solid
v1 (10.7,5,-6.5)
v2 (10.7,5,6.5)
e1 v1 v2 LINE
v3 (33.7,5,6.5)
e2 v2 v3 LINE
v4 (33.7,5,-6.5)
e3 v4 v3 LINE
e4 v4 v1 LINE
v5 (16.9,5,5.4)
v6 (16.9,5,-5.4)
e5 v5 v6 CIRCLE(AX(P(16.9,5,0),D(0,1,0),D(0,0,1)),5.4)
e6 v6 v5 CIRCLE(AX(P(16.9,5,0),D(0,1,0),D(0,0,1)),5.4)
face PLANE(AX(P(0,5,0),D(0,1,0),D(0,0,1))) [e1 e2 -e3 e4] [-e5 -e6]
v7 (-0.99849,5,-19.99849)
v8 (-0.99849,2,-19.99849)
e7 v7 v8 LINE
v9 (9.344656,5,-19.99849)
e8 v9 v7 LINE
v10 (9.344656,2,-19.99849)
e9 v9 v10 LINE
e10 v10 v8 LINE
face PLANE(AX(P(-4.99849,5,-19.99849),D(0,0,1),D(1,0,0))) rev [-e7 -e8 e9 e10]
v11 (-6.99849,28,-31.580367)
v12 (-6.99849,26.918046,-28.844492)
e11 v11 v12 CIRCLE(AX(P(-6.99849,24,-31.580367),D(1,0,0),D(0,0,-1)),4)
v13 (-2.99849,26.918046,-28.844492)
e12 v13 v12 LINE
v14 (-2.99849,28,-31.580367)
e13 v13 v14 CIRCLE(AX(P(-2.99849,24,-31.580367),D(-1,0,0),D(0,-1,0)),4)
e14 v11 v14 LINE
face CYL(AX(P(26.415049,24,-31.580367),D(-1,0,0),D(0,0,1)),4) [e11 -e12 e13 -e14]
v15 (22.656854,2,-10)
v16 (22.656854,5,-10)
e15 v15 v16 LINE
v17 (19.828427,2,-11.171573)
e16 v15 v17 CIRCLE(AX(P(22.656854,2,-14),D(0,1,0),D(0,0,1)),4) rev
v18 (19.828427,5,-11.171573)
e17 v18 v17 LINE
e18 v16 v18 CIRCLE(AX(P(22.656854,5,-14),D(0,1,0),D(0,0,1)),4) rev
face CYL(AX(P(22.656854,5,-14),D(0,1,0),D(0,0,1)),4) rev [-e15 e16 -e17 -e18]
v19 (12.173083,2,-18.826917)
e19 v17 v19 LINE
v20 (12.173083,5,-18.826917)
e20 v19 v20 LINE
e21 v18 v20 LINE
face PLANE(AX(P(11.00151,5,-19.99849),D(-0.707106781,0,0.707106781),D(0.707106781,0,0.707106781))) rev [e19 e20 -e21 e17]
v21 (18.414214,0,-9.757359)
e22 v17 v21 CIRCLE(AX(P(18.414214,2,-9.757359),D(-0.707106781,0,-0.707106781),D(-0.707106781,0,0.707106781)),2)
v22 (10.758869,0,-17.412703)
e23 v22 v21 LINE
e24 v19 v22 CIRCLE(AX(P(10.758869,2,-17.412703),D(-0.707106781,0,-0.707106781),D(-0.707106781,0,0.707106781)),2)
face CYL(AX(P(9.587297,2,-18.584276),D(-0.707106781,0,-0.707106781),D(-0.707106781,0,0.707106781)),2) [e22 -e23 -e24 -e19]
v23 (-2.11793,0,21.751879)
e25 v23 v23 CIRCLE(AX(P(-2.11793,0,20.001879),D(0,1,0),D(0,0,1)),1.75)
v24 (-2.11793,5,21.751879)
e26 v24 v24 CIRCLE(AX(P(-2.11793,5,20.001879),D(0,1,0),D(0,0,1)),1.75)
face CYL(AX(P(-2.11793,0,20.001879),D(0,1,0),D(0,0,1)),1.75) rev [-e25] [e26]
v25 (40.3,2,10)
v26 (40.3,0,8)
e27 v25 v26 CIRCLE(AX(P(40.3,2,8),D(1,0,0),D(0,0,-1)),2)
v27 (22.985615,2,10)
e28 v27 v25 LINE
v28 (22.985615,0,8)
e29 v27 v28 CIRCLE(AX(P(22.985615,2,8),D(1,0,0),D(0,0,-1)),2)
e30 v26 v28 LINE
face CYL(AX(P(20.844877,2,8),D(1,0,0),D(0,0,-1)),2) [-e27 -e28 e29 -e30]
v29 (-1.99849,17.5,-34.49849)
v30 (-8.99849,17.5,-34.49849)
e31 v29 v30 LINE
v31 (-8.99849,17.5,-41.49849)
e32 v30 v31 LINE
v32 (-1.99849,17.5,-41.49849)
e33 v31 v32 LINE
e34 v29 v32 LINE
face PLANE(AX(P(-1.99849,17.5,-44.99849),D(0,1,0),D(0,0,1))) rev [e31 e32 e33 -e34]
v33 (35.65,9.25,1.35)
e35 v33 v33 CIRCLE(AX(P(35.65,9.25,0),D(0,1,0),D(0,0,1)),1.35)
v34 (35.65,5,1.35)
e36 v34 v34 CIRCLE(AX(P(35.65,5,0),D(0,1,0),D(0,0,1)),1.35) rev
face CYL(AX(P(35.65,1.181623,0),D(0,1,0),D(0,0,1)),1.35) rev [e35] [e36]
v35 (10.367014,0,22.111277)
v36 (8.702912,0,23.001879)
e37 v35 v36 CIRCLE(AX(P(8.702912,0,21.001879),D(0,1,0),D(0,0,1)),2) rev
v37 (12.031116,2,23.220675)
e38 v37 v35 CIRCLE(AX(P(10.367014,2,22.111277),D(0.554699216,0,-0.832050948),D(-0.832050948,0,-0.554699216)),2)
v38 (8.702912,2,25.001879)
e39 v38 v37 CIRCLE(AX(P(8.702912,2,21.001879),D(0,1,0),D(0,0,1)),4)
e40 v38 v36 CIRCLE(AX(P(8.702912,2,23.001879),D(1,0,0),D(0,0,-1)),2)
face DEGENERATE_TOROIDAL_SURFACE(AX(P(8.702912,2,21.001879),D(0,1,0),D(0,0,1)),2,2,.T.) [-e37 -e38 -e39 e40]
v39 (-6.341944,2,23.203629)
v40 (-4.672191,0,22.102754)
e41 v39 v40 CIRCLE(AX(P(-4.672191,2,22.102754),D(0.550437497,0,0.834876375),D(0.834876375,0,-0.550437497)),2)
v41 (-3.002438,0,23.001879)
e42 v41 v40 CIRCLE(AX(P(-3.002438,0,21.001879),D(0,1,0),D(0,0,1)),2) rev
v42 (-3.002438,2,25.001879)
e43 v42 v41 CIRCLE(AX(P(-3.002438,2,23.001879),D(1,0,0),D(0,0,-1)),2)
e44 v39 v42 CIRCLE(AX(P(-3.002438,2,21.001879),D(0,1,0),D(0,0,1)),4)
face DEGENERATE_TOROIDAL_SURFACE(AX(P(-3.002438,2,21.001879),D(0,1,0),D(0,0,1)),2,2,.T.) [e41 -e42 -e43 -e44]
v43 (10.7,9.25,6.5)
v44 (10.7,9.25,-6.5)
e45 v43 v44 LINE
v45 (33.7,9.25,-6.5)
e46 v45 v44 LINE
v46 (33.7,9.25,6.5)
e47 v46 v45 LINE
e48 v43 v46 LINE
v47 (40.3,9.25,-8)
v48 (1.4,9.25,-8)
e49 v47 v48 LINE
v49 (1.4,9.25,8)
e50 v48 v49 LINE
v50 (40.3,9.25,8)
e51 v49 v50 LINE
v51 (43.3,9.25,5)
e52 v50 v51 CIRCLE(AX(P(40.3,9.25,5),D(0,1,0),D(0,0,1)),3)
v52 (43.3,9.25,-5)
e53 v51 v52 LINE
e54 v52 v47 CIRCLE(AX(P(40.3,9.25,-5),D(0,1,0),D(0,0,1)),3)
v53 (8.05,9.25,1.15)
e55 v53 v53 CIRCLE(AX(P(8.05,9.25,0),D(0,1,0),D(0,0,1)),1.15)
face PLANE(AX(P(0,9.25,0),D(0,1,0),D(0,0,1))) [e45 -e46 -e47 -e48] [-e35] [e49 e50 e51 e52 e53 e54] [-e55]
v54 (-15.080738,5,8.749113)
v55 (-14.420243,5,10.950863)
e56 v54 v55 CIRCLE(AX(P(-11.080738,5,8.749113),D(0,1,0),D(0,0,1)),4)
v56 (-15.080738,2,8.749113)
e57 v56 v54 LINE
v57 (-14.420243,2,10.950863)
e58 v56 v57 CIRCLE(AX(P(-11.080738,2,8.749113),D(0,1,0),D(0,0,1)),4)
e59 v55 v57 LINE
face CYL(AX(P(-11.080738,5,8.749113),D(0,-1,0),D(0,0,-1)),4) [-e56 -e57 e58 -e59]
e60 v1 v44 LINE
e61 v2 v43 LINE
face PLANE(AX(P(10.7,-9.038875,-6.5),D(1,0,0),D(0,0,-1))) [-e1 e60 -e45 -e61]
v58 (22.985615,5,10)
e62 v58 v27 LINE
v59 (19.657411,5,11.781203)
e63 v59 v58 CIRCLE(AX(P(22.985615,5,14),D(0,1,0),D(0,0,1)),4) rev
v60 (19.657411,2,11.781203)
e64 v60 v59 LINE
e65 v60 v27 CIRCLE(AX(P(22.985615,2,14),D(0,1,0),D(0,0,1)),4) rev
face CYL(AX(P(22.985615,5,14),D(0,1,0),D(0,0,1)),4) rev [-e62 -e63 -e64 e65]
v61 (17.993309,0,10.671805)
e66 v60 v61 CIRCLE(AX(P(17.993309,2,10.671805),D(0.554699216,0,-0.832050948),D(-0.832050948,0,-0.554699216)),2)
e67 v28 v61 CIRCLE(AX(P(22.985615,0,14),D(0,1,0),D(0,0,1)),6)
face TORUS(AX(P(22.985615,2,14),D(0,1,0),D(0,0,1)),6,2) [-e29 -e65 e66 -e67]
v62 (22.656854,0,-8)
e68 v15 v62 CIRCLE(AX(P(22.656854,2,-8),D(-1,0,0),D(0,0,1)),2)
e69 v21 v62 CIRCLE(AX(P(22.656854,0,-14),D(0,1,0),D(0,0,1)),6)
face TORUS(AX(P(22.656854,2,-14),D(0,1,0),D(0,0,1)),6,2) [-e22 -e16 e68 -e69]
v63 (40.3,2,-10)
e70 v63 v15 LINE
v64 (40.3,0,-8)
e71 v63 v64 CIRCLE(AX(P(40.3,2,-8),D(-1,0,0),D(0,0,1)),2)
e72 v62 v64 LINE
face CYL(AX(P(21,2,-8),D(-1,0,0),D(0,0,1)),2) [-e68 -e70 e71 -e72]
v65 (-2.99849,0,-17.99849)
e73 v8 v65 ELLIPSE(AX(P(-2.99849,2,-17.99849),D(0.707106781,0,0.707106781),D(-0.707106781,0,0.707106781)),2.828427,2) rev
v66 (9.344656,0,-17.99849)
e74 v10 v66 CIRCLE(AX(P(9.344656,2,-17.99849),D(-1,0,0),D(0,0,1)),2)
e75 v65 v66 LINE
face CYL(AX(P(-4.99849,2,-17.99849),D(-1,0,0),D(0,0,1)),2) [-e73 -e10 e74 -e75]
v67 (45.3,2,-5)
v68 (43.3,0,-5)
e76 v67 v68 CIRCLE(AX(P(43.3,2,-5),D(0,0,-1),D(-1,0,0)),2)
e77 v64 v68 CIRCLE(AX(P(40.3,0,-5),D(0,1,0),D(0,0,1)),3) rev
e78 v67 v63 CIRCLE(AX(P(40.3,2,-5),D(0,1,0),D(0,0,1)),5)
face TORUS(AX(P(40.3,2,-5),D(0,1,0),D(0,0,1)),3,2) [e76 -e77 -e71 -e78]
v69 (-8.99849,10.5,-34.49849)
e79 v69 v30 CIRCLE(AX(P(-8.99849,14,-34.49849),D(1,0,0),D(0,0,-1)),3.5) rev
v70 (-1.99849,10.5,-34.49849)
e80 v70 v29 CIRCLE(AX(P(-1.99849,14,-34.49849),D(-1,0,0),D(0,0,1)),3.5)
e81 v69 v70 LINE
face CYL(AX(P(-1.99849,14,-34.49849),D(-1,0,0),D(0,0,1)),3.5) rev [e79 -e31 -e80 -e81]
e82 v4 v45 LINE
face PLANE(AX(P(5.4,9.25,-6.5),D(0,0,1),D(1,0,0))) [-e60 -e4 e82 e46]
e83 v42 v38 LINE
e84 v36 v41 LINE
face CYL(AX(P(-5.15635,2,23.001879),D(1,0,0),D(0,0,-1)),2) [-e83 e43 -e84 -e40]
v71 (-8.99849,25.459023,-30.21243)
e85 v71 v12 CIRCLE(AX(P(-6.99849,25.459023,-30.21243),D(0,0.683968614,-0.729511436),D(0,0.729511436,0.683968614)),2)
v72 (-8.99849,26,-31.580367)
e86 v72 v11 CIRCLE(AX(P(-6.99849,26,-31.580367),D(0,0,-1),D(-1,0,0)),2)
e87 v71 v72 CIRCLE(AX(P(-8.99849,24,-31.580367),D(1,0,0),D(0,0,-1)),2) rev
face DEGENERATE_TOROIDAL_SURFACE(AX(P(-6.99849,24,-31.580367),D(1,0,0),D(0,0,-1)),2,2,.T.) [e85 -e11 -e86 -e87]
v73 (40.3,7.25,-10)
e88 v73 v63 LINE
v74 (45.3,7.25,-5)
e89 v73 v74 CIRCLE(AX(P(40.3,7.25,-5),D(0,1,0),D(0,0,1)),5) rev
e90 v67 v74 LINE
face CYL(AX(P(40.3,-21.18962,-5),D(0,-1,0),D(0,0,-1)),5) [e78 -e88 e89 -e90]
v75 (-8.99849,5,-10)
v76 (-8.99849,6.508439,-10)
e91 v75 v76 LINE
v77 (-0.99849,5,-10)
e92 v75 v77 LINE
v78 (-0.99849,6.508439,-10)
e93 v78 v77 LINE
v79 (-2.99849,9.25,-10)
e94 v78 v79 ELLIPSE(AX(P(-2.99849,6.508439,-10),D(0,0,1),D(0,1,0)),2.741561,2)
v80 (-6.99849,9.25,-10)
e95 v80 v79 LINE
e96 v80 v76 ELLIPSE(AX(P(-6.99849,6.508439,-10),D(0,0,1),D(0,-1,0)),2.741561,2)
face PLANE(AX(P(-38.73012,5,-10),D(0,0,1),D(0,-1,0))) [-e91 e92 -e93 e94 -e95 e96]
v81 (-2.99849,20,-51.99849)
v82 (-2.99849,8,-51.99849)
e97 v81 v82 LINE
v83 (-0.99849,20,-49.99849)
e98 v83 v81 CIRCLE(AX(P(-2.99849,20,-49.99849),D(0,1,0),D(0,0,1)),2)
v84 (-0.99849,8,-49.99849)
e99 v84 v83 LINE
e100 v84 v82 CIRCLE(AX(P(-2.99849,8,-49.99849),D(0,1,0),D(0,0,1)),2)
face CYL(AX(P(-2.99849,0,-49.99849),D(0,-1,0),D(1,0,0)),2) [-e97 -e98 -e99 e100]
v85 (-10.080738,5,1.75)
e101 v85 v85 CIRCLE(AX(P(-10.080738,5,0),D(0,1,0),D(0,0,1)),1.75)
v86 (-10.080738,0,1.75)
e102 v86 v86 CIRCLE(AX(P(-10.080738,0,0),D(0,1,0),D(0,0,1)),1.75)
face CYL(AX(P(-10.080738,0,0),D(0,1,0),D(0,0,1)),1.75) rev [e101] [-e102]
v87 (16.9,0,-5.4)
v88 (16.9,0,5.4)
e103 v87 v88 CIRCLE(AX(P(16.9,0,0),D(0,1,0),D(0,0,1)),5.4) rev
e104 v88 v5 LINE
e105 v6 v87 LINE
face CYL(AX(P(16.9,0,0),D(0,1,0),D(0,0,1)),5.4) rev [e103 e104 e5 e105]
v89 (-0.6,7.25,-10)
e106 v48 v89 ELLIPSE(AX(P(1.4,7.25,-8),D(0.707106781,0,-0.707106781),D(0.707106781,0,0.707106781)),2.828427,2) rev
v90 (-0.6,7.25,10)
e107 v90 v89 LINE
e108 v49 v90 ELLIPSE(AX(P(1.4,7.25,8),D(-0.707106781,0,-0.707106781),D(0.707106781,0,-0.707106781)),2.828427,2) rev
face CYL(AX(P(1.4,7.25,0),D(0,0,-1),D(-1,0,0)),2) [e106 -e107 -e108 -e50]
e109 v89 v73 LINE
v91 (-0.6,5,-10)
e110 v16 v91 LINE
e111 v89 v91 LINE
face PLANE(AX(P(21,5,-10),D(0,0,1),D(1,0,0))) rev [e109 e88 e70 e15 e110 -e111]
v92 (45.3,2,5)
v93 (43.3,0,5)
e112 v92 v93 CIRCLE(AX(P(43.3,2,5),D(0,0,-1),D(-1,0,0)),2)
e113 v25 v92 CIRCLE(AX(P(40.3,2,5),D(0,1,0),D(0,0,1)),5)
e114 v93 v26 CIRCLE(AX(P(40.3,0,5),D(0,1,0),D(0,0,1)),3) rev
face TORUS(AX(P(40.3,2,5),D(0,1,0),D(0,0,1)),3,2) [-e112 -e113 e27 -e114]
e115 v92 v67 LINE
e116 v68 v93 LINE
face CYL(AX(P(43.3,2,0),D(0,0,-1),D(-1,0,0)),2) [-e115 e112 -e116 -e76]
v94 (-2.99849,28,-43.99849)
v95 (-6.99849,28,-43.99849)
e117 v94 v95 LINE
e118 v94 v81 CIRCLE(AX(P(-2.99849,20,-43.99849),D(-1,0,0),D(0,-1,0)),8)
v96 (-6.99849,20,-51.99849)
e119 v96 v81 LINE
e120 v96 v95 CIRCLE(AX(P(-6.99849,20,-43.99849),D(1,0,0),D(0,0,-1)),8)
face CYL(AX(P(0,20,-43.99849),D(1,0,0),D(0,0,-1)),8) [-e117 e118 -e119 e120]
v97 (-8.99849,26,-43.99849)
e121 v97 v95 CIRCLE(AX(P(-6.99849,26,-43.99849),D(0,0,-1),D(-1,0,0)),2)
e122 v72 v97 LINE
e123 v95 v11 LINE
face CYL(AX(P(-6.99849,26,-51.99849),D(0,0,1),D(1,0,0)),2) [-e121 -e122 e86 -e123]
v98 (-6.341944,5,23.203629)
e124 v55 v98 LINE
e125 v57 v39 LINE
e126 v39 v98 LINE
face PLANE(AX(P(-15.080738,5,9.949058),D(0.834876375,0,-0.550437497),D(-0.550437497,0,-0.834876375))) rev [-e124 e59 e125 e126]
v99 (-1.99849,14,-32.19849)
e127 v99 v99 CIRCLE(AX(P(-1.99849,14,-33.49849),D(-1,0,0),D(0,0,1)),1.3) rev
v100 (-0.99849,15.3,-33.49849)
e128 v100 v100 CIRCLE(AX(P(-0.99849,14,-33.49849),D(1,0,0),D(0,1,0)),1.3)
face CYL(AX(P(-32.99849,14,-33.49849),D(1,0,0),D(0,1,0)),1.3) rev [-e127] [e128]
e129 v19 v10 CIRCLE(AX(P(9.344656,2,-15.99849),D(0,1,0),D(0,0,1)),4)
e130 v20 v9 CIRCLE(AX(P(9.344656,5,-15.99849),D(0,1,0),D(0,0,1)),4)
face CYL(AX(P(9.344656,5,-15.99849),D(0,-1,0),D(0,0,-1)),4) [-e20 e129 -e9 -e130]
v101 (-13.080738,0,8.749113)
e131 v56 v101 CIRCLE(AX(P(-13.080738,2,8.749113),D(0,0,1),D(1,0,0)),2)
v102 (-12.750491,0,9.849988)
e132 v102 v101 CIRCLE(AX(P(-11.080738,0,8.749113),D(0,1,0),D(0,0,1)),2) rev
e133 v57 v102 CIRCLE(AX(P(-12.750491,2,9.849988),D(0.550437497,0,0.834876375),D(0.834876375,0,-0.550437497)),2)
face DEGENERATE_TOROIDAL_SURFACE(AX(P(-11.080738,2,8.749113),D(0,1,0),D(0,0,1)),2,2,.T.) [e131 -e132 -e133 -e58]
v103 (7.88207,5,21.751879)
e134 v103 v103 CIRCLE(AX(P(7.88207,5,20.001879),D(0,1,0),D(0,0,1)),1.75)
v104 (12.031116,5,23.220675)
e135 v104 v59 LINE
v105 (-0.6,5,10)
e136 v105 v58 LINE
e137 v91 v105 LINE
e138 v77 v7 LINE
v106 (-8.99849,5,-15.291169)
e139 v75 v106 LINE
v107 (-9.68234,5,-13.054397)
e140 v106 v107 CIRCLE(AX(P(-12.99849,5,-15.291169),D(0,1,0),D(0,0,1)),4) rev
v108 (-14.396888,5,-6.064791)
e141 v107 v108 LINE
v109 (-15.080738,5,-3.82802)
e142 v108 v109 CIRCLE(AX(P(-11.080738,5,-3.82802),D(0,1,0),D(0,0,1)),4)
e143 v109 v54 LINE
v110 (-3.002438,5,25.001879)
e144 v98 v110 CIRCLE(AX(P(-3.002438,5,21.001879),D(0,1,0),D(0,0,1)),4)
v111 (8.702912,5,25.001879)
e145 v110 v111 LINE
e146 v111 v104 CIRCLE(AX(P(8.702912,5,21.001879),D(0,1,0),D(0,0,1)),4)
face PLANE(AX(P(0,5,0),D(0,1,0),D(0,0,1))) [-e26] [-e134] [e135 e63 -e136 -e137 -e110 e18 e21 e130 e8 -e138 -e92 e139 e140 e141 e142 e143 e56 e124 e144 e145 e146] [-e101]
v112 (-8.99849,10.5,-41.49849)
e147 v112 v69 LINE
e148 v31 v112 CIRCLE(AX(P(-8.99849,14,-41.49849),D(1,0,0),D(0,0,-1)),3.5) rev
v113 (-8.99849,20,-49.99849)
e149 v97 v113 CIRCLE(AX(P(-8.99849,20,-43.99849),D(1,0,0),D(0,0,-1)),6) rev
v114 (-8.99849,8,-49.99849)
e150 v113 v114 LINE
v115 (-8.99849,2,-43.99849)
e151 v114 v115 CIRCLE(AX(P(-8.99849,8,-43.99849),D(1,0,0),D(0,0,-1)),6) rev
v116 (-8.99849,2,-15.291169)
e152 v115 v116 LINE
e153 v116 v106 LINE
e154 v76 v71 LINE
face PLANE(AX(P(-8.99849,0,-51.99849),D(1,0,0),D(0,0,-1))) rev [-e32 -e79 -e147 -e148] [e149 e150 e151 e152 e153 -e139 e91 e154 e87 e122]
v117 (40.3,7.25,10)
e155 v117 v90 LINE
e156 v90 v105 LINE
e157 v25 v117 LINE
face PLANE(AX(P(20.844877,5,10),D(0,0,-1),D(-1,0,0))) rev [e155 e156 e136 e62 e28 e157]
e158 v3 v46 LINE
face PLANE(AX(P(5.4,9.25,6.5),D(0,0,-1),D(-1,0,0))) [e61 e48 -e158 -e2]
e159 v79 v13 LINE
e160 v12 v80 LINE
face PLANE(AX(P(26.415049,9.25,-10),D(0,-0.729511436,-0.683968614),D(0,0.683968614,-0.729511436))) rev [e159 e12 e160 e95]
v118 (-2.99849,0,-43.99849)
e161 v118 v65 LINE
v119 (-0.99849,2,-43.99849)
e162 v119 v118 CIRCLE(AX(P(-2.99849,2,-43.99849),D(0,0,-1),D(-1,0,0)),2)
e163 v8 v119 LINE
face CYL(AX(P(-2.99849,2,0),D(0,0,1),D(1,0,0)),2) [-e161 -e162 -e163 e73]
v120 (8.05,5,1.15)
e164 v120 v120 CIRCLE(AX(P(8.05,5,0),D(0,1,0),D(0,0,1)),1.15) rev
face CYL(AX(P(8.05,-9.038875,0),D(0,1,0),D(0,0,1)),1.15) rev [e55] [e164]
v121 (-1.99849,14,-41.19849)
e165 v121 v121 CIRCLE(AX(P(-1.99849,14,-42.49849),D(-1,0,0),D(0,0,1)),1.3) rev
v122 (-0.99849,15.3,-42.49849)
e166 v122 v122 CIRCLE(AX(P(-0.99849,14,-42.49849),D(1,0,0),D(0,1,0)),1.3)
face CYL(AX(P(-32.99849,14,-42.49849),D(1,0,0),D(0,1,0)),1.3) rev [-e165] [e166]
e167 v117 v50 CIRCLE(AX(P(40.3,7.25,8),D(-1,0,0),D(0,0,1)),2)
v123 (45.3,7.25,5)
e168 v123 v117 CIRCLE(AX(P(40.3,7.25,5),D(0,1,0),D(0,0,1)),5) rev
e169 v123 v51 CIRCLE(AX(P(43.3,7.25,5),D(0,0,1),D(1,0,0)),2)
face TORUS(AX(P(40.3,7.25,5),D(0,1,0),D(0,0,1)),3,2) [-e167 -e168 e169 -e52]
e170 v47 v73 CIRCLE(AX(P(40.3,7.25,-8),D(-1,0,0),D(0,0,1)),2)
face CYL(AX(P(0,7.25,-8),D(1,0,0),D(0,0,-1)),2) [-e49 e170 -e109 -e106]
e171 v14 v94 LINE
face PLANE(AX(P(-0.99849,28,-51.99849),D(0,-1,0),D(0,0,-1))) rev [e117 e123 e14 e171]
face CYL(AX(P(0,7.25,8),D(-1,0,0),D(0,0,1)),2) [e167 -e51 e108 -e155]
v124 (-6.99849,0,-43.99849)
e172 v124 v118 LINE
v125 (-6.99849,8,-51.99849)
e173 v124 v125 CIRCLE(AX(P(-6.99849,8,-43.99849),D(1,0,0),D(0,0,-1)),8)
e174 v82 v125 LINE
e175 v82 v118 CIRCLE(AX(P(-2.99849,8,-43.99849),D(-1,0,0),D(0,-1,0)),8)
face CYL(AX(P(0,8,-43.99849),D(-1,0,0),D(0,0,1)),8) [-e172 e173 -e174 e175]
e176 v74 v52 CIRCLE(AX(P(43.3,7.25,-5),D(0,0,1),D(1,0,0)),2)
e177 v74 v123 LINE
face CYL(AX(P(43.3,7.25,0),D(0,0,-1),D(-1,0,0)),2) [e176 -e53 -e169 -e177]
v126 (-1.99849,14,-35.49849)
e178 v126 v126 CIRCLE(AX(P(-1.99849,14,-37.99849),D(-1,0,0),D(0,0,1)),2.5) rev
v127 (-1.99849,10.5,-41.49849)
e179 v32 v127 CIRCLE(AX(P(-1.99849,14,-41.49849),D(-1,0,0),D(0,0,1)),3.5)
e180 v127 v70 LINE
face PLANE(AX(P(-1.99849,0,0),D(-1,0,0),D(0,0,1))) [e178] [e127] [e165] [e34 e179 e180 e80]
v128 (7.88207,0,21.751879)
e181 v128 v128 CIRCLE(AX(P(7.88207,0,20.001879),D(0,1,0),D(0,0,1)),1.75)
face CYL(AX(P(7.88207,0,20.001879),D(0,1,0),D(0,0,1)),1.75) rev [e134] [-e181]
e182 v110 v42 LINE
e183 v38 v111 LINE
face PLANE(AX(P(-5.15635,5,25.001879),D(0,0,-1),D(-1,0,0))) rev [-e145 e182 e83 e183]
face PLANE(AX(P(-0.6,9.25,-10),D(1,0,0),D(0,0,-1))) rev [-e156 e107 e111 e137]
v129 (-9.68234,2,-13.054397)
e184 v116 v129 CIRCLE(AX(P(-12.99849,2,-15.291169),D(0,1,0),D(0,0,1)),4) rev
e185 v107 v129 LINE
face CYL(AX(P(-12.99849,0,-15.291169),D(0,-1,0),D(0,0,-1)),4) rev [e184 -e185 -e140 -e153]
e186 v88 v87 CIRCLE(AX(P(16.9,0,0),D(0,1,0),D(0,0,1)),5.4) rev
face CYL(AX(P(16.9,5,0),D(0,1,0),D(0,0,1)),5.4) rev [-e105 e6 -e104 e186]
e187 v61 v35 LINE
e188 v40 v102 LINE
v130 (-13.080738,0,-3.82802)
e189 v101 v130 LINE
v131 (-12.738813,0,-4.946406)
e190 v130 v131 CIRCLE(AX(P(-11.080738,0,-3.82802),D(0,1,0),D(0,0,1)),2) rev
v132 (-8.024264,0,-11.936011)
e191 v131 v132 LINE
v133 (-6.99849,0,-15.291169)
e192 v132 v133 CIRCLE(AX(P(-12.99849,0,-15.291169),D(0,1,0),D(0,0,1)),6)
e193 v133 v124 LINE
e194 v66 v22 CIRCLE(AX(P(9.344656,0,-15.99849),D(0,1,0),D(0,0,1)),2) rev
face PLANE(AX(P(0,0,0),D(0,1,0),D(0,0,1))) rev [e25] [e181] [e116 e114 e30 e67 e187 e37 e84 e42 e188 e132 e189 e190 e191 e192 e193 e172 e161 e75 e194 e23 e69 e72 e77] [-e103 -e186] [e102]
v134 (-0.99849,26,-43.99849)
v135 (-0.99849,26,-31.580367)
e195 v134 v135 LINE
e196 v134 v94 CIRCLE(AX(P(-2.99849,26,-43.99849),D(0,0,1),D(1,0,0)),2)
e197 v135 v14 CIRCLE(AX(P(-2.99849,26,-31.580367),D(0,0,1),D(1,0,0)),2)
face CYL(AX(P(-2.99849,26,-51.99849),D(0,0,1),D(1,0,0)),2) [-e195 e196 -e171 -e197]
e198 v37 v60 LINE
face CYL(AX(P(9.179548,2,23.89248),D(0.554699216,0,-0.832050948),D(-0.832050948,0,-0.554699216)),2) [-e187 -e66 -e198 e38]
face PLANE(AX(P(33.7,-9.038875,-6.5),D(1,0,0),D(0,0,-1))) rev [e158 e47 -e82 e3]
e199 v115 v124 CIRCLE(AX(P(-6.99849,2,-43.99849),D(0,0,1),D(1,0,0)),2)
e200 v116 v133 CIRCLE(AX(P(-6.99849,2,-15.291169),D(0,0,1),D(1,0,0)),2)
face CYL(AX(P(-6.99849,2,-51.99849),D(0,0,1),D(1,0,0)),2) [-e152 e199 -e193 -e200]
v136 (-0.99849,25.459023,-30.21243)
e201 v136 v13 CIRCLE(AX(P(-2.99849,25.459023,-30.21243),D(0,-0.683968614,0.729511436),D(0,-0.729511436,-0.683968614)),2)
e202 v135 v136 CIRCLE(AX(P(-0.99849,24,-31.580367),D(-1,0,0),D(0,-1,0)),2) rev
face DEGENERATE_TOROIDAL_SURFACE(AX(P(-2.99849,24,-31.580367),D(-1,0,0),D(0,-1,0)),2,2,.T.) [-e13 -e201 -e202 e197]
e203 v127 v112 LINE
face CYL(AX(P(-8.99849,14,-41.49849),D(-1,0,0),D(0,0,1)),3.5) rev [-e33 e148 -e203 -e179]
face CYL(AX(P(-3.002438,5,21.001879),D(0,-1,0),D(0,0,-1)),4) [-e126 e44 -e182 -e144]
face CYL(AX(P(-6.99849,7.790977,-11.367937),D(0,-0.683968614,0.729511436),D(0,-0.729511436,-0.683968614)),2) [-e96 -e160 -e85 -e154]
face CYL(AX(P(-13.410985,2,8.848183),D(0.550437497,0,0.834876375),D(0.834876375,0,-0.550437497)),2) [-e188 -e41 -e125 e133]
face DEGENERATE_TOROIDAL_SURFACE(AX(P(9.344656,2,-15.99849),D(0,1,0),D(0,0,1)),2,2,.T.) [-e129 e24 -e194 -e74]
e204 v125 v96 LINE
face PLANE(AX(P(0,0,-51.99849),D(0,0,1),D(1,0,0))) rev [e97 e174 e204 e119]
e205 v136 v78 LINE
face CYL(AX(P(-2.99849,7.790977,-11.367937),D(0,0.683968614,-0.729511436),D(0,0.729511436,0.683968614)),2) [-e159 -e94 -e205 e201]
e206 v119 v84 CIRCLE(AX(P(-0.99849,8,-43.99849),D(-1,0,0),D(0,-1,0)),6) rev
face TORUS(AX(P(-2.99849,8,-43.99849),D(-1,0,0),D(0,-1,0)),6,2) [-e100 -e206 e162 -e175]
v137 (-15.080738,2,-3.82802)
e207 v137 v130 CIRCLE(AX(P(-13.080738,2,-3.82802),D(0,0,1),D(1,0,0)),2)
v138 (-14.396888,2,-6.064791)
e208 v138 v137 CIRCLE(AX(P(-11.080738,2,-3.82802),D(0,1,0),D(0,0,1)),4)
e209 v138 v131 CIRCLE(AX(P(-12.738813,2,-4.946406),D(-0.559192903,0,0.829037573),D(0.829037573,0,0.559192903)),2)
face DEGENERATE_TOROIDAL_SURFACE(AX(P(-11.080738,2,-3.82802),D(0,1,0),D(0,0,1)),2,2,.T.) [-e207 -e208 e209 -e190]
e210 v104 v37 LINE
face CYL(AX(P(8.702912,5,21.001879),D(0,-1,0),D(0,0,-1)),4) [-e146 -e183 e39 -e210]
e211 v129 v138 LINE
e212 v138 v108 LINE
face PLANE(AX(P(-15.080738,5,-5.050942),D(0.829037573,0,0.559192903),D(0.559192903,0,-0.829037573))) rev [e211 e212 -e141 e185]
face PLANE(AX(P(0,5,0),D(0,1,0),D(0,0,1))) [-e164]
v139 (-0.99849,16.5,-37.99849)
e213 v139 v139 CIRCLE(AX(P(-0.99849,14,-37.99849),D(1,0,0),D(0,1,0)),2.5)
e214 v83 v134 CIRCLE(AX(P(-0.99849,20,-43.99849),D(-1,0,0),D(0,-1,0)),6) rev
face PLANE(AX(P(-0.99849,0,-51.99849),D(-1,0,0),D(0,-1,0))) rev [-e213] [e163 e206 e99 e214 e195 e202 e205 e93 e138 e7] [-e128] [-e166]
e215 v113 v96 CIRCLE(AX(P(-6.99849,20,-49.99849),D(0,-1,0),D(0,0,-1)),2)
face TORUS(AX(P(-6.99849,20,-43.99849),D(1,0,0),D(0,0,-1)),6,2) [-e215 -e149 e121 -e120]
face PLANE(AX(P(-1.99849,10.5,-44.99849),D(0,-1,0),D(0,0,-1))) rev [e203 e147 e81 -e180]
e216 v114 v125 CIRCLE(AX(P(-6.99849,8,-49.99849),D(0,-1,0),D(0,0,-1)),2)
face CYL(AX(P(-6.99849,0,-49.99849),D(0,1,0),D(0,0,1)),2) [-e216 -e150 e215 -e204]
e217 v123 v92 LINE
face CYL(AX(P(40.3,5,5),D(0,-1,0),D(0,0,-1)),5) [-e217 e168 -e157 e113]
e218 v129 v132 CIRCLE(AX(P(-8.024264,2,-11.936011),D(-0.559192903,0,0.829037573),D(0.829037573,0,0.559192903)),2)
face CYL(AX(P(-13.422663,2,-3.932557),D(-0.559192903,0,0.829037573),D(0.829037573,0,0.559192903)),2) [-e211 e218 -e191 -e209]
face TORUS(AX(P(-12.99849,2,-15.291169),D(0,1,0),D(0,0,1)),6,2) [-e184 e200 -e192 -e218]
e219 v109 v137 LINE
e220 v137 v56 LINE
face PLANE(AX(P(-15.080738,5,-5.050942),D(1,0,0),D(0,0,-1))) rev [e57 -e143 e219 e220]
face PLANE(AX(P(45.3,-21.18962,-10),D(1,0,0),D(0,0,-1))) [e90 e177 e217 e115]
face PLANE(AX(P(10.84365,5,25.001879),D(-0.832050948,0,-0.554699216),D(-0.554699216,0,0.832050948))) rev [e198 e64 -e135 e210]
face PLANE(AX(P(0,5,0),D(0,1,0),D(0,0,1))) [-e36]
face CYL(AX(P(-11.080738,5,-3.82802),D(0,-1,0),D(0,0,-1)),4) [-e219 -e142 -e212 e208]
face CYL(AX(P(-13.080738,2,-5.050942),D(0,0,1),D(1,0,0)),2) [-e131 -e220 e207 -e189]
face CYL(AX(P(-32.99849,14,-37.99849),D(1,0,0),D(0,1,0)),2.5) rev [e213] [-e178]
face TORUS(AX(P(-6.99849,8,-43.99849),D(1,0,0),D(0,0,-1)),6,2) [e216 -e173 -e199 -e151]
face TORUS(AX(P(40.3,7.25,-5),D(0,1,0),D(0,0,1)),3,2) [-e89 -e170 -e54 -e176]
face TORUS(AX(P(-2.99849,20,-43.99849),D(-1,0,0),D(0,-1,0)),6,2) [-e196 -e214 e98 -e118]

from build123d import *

# Parameters (mm, degrees)
BOSS_EXTRUDE1_DEPTH  = 5
SKETCH3_R            = 1.75
SKETCH3_W            = 10.8
SKETCH3_H            = 10.8
CUT_EXTRUDE1_DEPTH   = 52.721310243
FILLET1_R            = 5.4
FILLET2_R            = 5.4
SKETCH4_W            = 35
SKETCH4_H            = 20
SKETCH4_W_2          = 23
SKETCH4_H_2          = 13
BOSS_EXTRUDE2_DEPTH  = 4.25
SKETCH5_W            = 10.6
SKETCH5_H            = 20
CUT_EXTRUDE2_DEPTH   = 52.721310243
FILLET4_R            = 4
SKETCH6_W            = 8
SKETCH6_H            = 28
BOSS_EXTRUDE3_DEPTH  = 32
SKETCH7_R            = 1.3
SKETCH7_R_2          = 2.5
CUT_EXTRUDE3_DEPTH   = 32
FILLET5_R            = 8
BOSS_EXTRUDE4_DEPTH  = 8
SKETCH9_W            = 14
SKETCH9_H            = 7
CUT_EXTRUDE4_DEPTH   = 7
FILLET6_R            = 3.5
FILLET7_R            = 3.5
CUT_EXTRUDE5_DEPTH   = 8
FILLET8_R            = 4
BOSS_EXTRUDE6_START  = -9.25
BOSS_EXTRUDE6_DEPTH  = 9.25
SKETCH13_W           = 5.3
SKETCH13_H           = 13
SKETCH13_R           = 1.15
BOSS_EXTRUDE9_DEPTH  = 4.25
SKETCH14_R           = 1.35
CUT_EXTRUDE6_DEPTH   = 4.25
SKETCH15_W           = 7
SKETCH15_H           = 20
BOSS_EXTRUDE10_DEPTH = 9.25
FILLET11_R           = 5
FILLET12_R           = 2
SKETCH16_W           = 5.3
SKETCH16_H           = 13
CUT_EXTRUDE7_DEPTH   = 4.25


# Some blends are built 0.0001 mm under size
with BuildPart() as part:
    # Sketch2 → Boss-Extrude1 (new body)
    with BuildSketch(Plane(origin=(0, 0, 0), x_dir=(1, 0, 0), z_dir=(0, 1, 0))):
        Polygon((-15.080737936, 5.050942453), (-4.998489886, 19.998489886), (11.001510114, 19.998489886), (21, 10), (45, 10), (45, -10), (20.844876991, -10), (10.843650133, -25.001878594), (-5.156349867, -25.001878594), (-15.080737936, -9.949057547), align=None)
    extrude(amount=BOSS_EXTRUDE1_DEPTH)

    # Sketch3 → Cut-Extrude1 (cut, through all)
    with BuildSketch(Plane(origin=(0, 5, 0), x_dir=(1, 0, 0), z_dir=(0, 1, 0))):
        with Locations(Location((-10.080737936, 0, 0), (0, 0, 270))):
            Circle(SKETCH3_R)
        with Locations(Location((-2.117930473, -20.001878594, 0), (0, 0, 270))):
            Circle(SKETCH3_R)
        with Locations(Location((7.882069527, -20.001878594, 0), (0, 0, 270))):
            Circle(SKETCH3_R)
        with Locations((16.9, 0)):
            Rectangle(SKETCH3_W, SKETCH3_H)
    extrude(amount=-CUT_EXTRUDE1_DEPTH, mode=Mode.SUBTRACT)

    # Fillet1
    fillet1_edges = [part.edges().sort_by_distance(p)[0] for p in [
        (11.5, 2.5, 5.4),
        (11.5, 2.5, -5.4),
    ]]
    fillet(fillet1_edges, radius=FILLET1_R - 0.0001)  # a hair under: the kernel refuses the full size

    # Fillet2
    # the kernel refuses this fillet: 5.4 mm, written as the material it adds along each edge
    with BuildSketch(Plane(origin=(22.3, 5, -5.4), x_dir=(0, 0, 1), z_dir=(0, -1, 0)), Plane(origin=(22.3, 5, 5.4), x_dir=(-1, 0, 0), z_dir=(0, -1, 0))) as fillet2_piece_1:
        with BuildLine():
            CenterArc((FILLET2_R, FILLET2_R), FILLET2_R, 180, 90)
            Line((0, FILLET2_R), (0, 0))
            Line((0, 0), (FILLET2_R, 0))
        make_face()
    extrude(amount=5)
    # the kernel refuses this fillet: 5.4 mm, written as the material it takes off along each edge

    # Sketch4 → Boss-Extrude2 (add)
    with BuildSketch(Plane(origin=(0, 5, 0), x_dir=(1, 0, 0), z_dir=(0, 1, 0))):
        with Locations((16.9, 0)):
            Rectangle(SKETCH4_W, SKETCH4_H)
        with Locations((16.9, 0)):
            Rectangle(SKETCH4_W_2, SKETCH4_H_2, mode=Mode.SUBTRACT)
    extrude(amount=BOSS_EXTRUDE2_DEPTH)

    # Sketch5 → Cut-Extrude2 (cut, through all)
    with BuildSketch(Plane(origin=(0, 5, 0), x_dir=(1, 0, 0), z_dir=(0, 1, 0))):
        with Locations((39.7, 0)):
            Rectangle(SKETCH5_W, SKETCH5_H)
    extrude(amount=-CUT_EXTRUDE2_DEPTH, mode=Mode.SUBTRACT)

    # Fillet4
    fillet4_edges = [part.edges().sort_by_distance(p)[0] for p in [
        (34.4, 4.625, 10),
        (34.4, 4.625, -10),
    ]]
    fillet(fillet4_edges, radius=FILLET4_R)

    # Sketch6 → Boss-Extrude3 (add)
    with BuildSketch(Plane(origin=(0, 0, -19.998489886), x_dir=(-1, 0, 0), z_dir=(0, 0, -1))):
        with Locations((4.998489886, 14)):
            Rectangle(SKETCH6_W, SKETCH6_H)
    extrude(amount=BOSS_EXTRUDE3_DEPTH)

    # Sketch7 → Cut-Extrude3 (cut)
    with BuildSketch(Plane(origin=(-0.998489886, 0, 0), x_dir=(0, 0, -1), z_dir=(1, 0, 0))):
        with Locations(Location((33.498489886, 14, 0), (0, 0, 90))):
            Circle(SKETCH7_R)
        with Locations(Location((37.998489886, 14, 0), (0, 0, 90))):
            Circle(SKETCH7_R_2)
        with Locations(Location((42.498489886, 14, 0), (0, 0, 90))):
            Circle(SKETCH7_R)
    extrude(amount=-CUT_EXTRUDE3_DEPTH, mode=Mode.SUBTRACT)

    # Fillet5
    fillet5_edges = [part.edges().sort_by_distance(p)[0] for p in [
        (-4.998489886, 0, -51.998489886),
        (-4.998489886, 28, -51.998489886),
    ]]
    fillet(fillet5_edges, radius=FILLET5_R)

    # Sketch8 → Boss-Extrude4 (add)
    with BuildSketch(Plane(origin=(-0.998489886, 0, 0), x_dir=(0, 0, -1), z_dir=(1, 0, 0))):
        Polygon((10, 5), (10, 9.25), (19.998489886, 28), (19.998489886, 5), (19.998489886, 0), (10, 0), align=None)
    extrude(amount=-BOSS_EXTRUDE4_DEPTH)

    # Sketch9 → Cut-Extrude4 (cut)
    with BuildSketch(Plane.ZY.offset(8.998489886)):
        with Locations((-37.998489886, 14)):
            Rectangle(SKETCH9_W, SKETCH9_H)
    extrude(amount=-CUT_EXTRUDE4_DEPTH, mode=Mode.SUBTRACT)

    # Fillet6
    fillet6_edges = [part.edges().sort_by_distance(p)[0] for p in [
        (-5.498489886, 10.5, -44.998489886),
        (-5.498489886, 17.5, -44.998489886),
    ]]
    fillet(fillet6_edges, radius=FILLET6_R - 0.0001)  # a hair under: the kernel refuses the full size

    # Fillet7
    fillet7_edges = [part.edges().sort_by_distance(p)[0] for p in [
        (-5.498489886, 17.5, -30.998489886),
        (-5.498489886, 10.5, -30.998489886),
    ]]
    fillet(fillet7_edges, radius=FILLET7_R - 0.0001)  # a hair under: the kernel refuses the full size

    # Sketch10 → Cut-Extrude5 (cut)
    with BuildSketch(Plane.ZY.offset(8.998489886)):
        Polygon((-19.998489886, 28), (-10, 9.25), (-29.998489886, 28), align=None)
    extrude(amount=-CUT_EXTRUDE5_DEPTH, mode=Mode.SUBTRACT)

    # Fillet8
    fillet8_edges = [part.edges().sort_by_distance(p)[0] for p in [
        (-15.080737936, 2.5, -5.050942453),
        (11.001510114, 2.5, -19.998489886),
        (21, 2.5, -10),
        (20.844876991, 2.5, 10),
        (10.843650133, 2.5, 25.001878594),
        (-5.156349867, 2.5, 25.001878594),
        (-15.080737936, 2.5, 9.949057547),
        (-8.998489886, 2.5, -14.068246012),
        (-4.998489886, 28, -29.998489886),
    ]]
    fillet(fillet8_edges, radius=FILLET8_R)

    # Sketch12 → Boss-Extrude6 (add)
    with BuildSketch(Plane(origin=(0, 9.25, 0), x_dir=(1, 0, 0), z_dir=(0, 1, 0)).offset(BOSS_EXTRUDE6_START)):
        with BuildLine():
            Line((34.4, -6), (34.4, 6))
            ThreePointArc((34.4, 6), (33.228427125, 8.828427125), (30.4, 10))
            Line((30.4, 10), (38.3, 10))
            Line((38.3, 10), (38.3, -10))
            Line((38.3, -10), (30.4, -10))
            ThreePointArc((30.4, -10), (33.228427125, -8.828427125), (34.4, -6))
        make_face()
    extrude(amount=BOSS_EXTRUDE6_DEPTH)

    # Sketch13 → Boss-Extrude9 (add)
    with BuildSketch(Plane(origin=(0, 9.25, 0), x_dir=(1, 0, 0), z_dir=(0, 1, 0))):
        with Locations((8.05, 0)):
            Rectangle(SKETCH13_W, SKETCH13_H)
        with Locations(Location((8.05, 0, 0), (0, 0, 270))):
            Circle(SKETCH13_R, mode=Mode.SUBTRACT)
    extrude(amount=-BOSS_EXTRUDE9_DEPTH)

    # Sketch14 → Cut-Extrude6 (cut)
    with BuildSketch(Plane(origin=(0, 9.25, 0), x_dir=(1, 0, 0), z_dir=(0, 1, 0))):
        with Locations(Location((35.65, 0, 0), (0, 0, 270))):
            Circle(SKETCH14_R)
    extrude(amount=-CUT_EXTRUDE6_DEPTH, mode=Mode.SUBTRACT)

    # Sketch15 → Boss-Extrude10 (add)
    with BuildSketch(Plane(origin=(0, 9.25, 0), x_dir=(1, 0, 0), z_dir=(0, 1, 0))):
        with Locations((41.8, 0)):
            Rectangle(SKETCH15_W, SKETCH15_H)
    extrude(amount=-BOSS_EXTRUDE10_DEPTH)

    # Fillet11
    fillet11_edges = [part.edges().sort_by_distance(p)[0] for p in [
        (45.3, 4.625, -10),
        (45.3, 4.625, 10),
    ]]
    fillet(fillet11_edges, radius=FILLET11_R)

    # Fillet12
    fillet12_edges = [part.edges().sort_by_distance(p)[0] for p in [
        (-0.998489886, 18.084022871, -19.422246242),
        (-0.998489886, 27.719689703, -30.109343993),
        (-0.998489886, 28, -37.789428414),
        (-0.998489886, 25.656854249, -49.655344135),
        (-0.998489886, 0, -31.998489886),
        (-0.998489886, 2.343145751, -49.655344135),
        (19.85, 9.25, 10),
        (43.835533906, 0, 8.535533906),
        (43.835533906, 9.25, 8.535533906),
        (45.3, 9.25, 0),
        (45.3, 0, 0),
        (43.835533906, 0, -8.535533906),
        (43.835533906, 9.25, -8.535533906),
        (4.173082989, 0, -19.998489886),
        (10.875389594, 0, -19.694008016),
        (16.000755057, 0, -14.999244943),
        (21.12612052, 0, -10.30448187),
        (31.478427125, 0, -10),
        (-8.998489886, 18.084022871, -19.422246242),
        (-8.998489886, 27.719689703, -30.109343993),
        (-8.998489886, 28, -37.789428414),
        (-8.998489886, 25.656854249, -49.655344135),
        (-8.998489886, 14, -51.998489886),
        (-8.998489886, 2.343145751, -49.655344135),
        (-8.998489886, 0, -29.644829312),
        (-9.173270862, 0, -14.121681919),
        (-12.039613911, 0, -9.559594232),
        (-14.905956959, 0, -4.997506546),
        (-15.080737936, 0, 2.460546613),
        (-14.912057682, 0, 9.898455808),
        (-10.381093541, 0, 17.077245761),
        (-4.898882191, 0, 24.523738894),
        (2.850236962, 0, 25.001878594),
        (10.590345847, 0, 24.528575877),
        (15.844263562, 0, 17.500939297),
        (21.098181276, 0, 10.473302717),
        (31.642807528, 0, 10),
        (-0.998489886, 14, -51.998489886),
        (-0.6, 9.25, 0),
        (19.85, 9.25, -10),
    ]]
    fillet(fillet12_edges, radius=FILLET12_R)

    # Sketch16 → Cut-Extrude7 (cut)
    with BuildSketch(Plane(origin=(0, 9.25, 0), x_dir=(1, 0, 0), z_dir=(0, 1, 0))):
        with Locations((31.05, 0)):
            Rectangle(SKETCH16_W, SKETCH16_H)
    extrude(amount=-CUT_EXTRUDE7_DEPTH, mode=Mode.SUBTRACT)


solid = part.part
